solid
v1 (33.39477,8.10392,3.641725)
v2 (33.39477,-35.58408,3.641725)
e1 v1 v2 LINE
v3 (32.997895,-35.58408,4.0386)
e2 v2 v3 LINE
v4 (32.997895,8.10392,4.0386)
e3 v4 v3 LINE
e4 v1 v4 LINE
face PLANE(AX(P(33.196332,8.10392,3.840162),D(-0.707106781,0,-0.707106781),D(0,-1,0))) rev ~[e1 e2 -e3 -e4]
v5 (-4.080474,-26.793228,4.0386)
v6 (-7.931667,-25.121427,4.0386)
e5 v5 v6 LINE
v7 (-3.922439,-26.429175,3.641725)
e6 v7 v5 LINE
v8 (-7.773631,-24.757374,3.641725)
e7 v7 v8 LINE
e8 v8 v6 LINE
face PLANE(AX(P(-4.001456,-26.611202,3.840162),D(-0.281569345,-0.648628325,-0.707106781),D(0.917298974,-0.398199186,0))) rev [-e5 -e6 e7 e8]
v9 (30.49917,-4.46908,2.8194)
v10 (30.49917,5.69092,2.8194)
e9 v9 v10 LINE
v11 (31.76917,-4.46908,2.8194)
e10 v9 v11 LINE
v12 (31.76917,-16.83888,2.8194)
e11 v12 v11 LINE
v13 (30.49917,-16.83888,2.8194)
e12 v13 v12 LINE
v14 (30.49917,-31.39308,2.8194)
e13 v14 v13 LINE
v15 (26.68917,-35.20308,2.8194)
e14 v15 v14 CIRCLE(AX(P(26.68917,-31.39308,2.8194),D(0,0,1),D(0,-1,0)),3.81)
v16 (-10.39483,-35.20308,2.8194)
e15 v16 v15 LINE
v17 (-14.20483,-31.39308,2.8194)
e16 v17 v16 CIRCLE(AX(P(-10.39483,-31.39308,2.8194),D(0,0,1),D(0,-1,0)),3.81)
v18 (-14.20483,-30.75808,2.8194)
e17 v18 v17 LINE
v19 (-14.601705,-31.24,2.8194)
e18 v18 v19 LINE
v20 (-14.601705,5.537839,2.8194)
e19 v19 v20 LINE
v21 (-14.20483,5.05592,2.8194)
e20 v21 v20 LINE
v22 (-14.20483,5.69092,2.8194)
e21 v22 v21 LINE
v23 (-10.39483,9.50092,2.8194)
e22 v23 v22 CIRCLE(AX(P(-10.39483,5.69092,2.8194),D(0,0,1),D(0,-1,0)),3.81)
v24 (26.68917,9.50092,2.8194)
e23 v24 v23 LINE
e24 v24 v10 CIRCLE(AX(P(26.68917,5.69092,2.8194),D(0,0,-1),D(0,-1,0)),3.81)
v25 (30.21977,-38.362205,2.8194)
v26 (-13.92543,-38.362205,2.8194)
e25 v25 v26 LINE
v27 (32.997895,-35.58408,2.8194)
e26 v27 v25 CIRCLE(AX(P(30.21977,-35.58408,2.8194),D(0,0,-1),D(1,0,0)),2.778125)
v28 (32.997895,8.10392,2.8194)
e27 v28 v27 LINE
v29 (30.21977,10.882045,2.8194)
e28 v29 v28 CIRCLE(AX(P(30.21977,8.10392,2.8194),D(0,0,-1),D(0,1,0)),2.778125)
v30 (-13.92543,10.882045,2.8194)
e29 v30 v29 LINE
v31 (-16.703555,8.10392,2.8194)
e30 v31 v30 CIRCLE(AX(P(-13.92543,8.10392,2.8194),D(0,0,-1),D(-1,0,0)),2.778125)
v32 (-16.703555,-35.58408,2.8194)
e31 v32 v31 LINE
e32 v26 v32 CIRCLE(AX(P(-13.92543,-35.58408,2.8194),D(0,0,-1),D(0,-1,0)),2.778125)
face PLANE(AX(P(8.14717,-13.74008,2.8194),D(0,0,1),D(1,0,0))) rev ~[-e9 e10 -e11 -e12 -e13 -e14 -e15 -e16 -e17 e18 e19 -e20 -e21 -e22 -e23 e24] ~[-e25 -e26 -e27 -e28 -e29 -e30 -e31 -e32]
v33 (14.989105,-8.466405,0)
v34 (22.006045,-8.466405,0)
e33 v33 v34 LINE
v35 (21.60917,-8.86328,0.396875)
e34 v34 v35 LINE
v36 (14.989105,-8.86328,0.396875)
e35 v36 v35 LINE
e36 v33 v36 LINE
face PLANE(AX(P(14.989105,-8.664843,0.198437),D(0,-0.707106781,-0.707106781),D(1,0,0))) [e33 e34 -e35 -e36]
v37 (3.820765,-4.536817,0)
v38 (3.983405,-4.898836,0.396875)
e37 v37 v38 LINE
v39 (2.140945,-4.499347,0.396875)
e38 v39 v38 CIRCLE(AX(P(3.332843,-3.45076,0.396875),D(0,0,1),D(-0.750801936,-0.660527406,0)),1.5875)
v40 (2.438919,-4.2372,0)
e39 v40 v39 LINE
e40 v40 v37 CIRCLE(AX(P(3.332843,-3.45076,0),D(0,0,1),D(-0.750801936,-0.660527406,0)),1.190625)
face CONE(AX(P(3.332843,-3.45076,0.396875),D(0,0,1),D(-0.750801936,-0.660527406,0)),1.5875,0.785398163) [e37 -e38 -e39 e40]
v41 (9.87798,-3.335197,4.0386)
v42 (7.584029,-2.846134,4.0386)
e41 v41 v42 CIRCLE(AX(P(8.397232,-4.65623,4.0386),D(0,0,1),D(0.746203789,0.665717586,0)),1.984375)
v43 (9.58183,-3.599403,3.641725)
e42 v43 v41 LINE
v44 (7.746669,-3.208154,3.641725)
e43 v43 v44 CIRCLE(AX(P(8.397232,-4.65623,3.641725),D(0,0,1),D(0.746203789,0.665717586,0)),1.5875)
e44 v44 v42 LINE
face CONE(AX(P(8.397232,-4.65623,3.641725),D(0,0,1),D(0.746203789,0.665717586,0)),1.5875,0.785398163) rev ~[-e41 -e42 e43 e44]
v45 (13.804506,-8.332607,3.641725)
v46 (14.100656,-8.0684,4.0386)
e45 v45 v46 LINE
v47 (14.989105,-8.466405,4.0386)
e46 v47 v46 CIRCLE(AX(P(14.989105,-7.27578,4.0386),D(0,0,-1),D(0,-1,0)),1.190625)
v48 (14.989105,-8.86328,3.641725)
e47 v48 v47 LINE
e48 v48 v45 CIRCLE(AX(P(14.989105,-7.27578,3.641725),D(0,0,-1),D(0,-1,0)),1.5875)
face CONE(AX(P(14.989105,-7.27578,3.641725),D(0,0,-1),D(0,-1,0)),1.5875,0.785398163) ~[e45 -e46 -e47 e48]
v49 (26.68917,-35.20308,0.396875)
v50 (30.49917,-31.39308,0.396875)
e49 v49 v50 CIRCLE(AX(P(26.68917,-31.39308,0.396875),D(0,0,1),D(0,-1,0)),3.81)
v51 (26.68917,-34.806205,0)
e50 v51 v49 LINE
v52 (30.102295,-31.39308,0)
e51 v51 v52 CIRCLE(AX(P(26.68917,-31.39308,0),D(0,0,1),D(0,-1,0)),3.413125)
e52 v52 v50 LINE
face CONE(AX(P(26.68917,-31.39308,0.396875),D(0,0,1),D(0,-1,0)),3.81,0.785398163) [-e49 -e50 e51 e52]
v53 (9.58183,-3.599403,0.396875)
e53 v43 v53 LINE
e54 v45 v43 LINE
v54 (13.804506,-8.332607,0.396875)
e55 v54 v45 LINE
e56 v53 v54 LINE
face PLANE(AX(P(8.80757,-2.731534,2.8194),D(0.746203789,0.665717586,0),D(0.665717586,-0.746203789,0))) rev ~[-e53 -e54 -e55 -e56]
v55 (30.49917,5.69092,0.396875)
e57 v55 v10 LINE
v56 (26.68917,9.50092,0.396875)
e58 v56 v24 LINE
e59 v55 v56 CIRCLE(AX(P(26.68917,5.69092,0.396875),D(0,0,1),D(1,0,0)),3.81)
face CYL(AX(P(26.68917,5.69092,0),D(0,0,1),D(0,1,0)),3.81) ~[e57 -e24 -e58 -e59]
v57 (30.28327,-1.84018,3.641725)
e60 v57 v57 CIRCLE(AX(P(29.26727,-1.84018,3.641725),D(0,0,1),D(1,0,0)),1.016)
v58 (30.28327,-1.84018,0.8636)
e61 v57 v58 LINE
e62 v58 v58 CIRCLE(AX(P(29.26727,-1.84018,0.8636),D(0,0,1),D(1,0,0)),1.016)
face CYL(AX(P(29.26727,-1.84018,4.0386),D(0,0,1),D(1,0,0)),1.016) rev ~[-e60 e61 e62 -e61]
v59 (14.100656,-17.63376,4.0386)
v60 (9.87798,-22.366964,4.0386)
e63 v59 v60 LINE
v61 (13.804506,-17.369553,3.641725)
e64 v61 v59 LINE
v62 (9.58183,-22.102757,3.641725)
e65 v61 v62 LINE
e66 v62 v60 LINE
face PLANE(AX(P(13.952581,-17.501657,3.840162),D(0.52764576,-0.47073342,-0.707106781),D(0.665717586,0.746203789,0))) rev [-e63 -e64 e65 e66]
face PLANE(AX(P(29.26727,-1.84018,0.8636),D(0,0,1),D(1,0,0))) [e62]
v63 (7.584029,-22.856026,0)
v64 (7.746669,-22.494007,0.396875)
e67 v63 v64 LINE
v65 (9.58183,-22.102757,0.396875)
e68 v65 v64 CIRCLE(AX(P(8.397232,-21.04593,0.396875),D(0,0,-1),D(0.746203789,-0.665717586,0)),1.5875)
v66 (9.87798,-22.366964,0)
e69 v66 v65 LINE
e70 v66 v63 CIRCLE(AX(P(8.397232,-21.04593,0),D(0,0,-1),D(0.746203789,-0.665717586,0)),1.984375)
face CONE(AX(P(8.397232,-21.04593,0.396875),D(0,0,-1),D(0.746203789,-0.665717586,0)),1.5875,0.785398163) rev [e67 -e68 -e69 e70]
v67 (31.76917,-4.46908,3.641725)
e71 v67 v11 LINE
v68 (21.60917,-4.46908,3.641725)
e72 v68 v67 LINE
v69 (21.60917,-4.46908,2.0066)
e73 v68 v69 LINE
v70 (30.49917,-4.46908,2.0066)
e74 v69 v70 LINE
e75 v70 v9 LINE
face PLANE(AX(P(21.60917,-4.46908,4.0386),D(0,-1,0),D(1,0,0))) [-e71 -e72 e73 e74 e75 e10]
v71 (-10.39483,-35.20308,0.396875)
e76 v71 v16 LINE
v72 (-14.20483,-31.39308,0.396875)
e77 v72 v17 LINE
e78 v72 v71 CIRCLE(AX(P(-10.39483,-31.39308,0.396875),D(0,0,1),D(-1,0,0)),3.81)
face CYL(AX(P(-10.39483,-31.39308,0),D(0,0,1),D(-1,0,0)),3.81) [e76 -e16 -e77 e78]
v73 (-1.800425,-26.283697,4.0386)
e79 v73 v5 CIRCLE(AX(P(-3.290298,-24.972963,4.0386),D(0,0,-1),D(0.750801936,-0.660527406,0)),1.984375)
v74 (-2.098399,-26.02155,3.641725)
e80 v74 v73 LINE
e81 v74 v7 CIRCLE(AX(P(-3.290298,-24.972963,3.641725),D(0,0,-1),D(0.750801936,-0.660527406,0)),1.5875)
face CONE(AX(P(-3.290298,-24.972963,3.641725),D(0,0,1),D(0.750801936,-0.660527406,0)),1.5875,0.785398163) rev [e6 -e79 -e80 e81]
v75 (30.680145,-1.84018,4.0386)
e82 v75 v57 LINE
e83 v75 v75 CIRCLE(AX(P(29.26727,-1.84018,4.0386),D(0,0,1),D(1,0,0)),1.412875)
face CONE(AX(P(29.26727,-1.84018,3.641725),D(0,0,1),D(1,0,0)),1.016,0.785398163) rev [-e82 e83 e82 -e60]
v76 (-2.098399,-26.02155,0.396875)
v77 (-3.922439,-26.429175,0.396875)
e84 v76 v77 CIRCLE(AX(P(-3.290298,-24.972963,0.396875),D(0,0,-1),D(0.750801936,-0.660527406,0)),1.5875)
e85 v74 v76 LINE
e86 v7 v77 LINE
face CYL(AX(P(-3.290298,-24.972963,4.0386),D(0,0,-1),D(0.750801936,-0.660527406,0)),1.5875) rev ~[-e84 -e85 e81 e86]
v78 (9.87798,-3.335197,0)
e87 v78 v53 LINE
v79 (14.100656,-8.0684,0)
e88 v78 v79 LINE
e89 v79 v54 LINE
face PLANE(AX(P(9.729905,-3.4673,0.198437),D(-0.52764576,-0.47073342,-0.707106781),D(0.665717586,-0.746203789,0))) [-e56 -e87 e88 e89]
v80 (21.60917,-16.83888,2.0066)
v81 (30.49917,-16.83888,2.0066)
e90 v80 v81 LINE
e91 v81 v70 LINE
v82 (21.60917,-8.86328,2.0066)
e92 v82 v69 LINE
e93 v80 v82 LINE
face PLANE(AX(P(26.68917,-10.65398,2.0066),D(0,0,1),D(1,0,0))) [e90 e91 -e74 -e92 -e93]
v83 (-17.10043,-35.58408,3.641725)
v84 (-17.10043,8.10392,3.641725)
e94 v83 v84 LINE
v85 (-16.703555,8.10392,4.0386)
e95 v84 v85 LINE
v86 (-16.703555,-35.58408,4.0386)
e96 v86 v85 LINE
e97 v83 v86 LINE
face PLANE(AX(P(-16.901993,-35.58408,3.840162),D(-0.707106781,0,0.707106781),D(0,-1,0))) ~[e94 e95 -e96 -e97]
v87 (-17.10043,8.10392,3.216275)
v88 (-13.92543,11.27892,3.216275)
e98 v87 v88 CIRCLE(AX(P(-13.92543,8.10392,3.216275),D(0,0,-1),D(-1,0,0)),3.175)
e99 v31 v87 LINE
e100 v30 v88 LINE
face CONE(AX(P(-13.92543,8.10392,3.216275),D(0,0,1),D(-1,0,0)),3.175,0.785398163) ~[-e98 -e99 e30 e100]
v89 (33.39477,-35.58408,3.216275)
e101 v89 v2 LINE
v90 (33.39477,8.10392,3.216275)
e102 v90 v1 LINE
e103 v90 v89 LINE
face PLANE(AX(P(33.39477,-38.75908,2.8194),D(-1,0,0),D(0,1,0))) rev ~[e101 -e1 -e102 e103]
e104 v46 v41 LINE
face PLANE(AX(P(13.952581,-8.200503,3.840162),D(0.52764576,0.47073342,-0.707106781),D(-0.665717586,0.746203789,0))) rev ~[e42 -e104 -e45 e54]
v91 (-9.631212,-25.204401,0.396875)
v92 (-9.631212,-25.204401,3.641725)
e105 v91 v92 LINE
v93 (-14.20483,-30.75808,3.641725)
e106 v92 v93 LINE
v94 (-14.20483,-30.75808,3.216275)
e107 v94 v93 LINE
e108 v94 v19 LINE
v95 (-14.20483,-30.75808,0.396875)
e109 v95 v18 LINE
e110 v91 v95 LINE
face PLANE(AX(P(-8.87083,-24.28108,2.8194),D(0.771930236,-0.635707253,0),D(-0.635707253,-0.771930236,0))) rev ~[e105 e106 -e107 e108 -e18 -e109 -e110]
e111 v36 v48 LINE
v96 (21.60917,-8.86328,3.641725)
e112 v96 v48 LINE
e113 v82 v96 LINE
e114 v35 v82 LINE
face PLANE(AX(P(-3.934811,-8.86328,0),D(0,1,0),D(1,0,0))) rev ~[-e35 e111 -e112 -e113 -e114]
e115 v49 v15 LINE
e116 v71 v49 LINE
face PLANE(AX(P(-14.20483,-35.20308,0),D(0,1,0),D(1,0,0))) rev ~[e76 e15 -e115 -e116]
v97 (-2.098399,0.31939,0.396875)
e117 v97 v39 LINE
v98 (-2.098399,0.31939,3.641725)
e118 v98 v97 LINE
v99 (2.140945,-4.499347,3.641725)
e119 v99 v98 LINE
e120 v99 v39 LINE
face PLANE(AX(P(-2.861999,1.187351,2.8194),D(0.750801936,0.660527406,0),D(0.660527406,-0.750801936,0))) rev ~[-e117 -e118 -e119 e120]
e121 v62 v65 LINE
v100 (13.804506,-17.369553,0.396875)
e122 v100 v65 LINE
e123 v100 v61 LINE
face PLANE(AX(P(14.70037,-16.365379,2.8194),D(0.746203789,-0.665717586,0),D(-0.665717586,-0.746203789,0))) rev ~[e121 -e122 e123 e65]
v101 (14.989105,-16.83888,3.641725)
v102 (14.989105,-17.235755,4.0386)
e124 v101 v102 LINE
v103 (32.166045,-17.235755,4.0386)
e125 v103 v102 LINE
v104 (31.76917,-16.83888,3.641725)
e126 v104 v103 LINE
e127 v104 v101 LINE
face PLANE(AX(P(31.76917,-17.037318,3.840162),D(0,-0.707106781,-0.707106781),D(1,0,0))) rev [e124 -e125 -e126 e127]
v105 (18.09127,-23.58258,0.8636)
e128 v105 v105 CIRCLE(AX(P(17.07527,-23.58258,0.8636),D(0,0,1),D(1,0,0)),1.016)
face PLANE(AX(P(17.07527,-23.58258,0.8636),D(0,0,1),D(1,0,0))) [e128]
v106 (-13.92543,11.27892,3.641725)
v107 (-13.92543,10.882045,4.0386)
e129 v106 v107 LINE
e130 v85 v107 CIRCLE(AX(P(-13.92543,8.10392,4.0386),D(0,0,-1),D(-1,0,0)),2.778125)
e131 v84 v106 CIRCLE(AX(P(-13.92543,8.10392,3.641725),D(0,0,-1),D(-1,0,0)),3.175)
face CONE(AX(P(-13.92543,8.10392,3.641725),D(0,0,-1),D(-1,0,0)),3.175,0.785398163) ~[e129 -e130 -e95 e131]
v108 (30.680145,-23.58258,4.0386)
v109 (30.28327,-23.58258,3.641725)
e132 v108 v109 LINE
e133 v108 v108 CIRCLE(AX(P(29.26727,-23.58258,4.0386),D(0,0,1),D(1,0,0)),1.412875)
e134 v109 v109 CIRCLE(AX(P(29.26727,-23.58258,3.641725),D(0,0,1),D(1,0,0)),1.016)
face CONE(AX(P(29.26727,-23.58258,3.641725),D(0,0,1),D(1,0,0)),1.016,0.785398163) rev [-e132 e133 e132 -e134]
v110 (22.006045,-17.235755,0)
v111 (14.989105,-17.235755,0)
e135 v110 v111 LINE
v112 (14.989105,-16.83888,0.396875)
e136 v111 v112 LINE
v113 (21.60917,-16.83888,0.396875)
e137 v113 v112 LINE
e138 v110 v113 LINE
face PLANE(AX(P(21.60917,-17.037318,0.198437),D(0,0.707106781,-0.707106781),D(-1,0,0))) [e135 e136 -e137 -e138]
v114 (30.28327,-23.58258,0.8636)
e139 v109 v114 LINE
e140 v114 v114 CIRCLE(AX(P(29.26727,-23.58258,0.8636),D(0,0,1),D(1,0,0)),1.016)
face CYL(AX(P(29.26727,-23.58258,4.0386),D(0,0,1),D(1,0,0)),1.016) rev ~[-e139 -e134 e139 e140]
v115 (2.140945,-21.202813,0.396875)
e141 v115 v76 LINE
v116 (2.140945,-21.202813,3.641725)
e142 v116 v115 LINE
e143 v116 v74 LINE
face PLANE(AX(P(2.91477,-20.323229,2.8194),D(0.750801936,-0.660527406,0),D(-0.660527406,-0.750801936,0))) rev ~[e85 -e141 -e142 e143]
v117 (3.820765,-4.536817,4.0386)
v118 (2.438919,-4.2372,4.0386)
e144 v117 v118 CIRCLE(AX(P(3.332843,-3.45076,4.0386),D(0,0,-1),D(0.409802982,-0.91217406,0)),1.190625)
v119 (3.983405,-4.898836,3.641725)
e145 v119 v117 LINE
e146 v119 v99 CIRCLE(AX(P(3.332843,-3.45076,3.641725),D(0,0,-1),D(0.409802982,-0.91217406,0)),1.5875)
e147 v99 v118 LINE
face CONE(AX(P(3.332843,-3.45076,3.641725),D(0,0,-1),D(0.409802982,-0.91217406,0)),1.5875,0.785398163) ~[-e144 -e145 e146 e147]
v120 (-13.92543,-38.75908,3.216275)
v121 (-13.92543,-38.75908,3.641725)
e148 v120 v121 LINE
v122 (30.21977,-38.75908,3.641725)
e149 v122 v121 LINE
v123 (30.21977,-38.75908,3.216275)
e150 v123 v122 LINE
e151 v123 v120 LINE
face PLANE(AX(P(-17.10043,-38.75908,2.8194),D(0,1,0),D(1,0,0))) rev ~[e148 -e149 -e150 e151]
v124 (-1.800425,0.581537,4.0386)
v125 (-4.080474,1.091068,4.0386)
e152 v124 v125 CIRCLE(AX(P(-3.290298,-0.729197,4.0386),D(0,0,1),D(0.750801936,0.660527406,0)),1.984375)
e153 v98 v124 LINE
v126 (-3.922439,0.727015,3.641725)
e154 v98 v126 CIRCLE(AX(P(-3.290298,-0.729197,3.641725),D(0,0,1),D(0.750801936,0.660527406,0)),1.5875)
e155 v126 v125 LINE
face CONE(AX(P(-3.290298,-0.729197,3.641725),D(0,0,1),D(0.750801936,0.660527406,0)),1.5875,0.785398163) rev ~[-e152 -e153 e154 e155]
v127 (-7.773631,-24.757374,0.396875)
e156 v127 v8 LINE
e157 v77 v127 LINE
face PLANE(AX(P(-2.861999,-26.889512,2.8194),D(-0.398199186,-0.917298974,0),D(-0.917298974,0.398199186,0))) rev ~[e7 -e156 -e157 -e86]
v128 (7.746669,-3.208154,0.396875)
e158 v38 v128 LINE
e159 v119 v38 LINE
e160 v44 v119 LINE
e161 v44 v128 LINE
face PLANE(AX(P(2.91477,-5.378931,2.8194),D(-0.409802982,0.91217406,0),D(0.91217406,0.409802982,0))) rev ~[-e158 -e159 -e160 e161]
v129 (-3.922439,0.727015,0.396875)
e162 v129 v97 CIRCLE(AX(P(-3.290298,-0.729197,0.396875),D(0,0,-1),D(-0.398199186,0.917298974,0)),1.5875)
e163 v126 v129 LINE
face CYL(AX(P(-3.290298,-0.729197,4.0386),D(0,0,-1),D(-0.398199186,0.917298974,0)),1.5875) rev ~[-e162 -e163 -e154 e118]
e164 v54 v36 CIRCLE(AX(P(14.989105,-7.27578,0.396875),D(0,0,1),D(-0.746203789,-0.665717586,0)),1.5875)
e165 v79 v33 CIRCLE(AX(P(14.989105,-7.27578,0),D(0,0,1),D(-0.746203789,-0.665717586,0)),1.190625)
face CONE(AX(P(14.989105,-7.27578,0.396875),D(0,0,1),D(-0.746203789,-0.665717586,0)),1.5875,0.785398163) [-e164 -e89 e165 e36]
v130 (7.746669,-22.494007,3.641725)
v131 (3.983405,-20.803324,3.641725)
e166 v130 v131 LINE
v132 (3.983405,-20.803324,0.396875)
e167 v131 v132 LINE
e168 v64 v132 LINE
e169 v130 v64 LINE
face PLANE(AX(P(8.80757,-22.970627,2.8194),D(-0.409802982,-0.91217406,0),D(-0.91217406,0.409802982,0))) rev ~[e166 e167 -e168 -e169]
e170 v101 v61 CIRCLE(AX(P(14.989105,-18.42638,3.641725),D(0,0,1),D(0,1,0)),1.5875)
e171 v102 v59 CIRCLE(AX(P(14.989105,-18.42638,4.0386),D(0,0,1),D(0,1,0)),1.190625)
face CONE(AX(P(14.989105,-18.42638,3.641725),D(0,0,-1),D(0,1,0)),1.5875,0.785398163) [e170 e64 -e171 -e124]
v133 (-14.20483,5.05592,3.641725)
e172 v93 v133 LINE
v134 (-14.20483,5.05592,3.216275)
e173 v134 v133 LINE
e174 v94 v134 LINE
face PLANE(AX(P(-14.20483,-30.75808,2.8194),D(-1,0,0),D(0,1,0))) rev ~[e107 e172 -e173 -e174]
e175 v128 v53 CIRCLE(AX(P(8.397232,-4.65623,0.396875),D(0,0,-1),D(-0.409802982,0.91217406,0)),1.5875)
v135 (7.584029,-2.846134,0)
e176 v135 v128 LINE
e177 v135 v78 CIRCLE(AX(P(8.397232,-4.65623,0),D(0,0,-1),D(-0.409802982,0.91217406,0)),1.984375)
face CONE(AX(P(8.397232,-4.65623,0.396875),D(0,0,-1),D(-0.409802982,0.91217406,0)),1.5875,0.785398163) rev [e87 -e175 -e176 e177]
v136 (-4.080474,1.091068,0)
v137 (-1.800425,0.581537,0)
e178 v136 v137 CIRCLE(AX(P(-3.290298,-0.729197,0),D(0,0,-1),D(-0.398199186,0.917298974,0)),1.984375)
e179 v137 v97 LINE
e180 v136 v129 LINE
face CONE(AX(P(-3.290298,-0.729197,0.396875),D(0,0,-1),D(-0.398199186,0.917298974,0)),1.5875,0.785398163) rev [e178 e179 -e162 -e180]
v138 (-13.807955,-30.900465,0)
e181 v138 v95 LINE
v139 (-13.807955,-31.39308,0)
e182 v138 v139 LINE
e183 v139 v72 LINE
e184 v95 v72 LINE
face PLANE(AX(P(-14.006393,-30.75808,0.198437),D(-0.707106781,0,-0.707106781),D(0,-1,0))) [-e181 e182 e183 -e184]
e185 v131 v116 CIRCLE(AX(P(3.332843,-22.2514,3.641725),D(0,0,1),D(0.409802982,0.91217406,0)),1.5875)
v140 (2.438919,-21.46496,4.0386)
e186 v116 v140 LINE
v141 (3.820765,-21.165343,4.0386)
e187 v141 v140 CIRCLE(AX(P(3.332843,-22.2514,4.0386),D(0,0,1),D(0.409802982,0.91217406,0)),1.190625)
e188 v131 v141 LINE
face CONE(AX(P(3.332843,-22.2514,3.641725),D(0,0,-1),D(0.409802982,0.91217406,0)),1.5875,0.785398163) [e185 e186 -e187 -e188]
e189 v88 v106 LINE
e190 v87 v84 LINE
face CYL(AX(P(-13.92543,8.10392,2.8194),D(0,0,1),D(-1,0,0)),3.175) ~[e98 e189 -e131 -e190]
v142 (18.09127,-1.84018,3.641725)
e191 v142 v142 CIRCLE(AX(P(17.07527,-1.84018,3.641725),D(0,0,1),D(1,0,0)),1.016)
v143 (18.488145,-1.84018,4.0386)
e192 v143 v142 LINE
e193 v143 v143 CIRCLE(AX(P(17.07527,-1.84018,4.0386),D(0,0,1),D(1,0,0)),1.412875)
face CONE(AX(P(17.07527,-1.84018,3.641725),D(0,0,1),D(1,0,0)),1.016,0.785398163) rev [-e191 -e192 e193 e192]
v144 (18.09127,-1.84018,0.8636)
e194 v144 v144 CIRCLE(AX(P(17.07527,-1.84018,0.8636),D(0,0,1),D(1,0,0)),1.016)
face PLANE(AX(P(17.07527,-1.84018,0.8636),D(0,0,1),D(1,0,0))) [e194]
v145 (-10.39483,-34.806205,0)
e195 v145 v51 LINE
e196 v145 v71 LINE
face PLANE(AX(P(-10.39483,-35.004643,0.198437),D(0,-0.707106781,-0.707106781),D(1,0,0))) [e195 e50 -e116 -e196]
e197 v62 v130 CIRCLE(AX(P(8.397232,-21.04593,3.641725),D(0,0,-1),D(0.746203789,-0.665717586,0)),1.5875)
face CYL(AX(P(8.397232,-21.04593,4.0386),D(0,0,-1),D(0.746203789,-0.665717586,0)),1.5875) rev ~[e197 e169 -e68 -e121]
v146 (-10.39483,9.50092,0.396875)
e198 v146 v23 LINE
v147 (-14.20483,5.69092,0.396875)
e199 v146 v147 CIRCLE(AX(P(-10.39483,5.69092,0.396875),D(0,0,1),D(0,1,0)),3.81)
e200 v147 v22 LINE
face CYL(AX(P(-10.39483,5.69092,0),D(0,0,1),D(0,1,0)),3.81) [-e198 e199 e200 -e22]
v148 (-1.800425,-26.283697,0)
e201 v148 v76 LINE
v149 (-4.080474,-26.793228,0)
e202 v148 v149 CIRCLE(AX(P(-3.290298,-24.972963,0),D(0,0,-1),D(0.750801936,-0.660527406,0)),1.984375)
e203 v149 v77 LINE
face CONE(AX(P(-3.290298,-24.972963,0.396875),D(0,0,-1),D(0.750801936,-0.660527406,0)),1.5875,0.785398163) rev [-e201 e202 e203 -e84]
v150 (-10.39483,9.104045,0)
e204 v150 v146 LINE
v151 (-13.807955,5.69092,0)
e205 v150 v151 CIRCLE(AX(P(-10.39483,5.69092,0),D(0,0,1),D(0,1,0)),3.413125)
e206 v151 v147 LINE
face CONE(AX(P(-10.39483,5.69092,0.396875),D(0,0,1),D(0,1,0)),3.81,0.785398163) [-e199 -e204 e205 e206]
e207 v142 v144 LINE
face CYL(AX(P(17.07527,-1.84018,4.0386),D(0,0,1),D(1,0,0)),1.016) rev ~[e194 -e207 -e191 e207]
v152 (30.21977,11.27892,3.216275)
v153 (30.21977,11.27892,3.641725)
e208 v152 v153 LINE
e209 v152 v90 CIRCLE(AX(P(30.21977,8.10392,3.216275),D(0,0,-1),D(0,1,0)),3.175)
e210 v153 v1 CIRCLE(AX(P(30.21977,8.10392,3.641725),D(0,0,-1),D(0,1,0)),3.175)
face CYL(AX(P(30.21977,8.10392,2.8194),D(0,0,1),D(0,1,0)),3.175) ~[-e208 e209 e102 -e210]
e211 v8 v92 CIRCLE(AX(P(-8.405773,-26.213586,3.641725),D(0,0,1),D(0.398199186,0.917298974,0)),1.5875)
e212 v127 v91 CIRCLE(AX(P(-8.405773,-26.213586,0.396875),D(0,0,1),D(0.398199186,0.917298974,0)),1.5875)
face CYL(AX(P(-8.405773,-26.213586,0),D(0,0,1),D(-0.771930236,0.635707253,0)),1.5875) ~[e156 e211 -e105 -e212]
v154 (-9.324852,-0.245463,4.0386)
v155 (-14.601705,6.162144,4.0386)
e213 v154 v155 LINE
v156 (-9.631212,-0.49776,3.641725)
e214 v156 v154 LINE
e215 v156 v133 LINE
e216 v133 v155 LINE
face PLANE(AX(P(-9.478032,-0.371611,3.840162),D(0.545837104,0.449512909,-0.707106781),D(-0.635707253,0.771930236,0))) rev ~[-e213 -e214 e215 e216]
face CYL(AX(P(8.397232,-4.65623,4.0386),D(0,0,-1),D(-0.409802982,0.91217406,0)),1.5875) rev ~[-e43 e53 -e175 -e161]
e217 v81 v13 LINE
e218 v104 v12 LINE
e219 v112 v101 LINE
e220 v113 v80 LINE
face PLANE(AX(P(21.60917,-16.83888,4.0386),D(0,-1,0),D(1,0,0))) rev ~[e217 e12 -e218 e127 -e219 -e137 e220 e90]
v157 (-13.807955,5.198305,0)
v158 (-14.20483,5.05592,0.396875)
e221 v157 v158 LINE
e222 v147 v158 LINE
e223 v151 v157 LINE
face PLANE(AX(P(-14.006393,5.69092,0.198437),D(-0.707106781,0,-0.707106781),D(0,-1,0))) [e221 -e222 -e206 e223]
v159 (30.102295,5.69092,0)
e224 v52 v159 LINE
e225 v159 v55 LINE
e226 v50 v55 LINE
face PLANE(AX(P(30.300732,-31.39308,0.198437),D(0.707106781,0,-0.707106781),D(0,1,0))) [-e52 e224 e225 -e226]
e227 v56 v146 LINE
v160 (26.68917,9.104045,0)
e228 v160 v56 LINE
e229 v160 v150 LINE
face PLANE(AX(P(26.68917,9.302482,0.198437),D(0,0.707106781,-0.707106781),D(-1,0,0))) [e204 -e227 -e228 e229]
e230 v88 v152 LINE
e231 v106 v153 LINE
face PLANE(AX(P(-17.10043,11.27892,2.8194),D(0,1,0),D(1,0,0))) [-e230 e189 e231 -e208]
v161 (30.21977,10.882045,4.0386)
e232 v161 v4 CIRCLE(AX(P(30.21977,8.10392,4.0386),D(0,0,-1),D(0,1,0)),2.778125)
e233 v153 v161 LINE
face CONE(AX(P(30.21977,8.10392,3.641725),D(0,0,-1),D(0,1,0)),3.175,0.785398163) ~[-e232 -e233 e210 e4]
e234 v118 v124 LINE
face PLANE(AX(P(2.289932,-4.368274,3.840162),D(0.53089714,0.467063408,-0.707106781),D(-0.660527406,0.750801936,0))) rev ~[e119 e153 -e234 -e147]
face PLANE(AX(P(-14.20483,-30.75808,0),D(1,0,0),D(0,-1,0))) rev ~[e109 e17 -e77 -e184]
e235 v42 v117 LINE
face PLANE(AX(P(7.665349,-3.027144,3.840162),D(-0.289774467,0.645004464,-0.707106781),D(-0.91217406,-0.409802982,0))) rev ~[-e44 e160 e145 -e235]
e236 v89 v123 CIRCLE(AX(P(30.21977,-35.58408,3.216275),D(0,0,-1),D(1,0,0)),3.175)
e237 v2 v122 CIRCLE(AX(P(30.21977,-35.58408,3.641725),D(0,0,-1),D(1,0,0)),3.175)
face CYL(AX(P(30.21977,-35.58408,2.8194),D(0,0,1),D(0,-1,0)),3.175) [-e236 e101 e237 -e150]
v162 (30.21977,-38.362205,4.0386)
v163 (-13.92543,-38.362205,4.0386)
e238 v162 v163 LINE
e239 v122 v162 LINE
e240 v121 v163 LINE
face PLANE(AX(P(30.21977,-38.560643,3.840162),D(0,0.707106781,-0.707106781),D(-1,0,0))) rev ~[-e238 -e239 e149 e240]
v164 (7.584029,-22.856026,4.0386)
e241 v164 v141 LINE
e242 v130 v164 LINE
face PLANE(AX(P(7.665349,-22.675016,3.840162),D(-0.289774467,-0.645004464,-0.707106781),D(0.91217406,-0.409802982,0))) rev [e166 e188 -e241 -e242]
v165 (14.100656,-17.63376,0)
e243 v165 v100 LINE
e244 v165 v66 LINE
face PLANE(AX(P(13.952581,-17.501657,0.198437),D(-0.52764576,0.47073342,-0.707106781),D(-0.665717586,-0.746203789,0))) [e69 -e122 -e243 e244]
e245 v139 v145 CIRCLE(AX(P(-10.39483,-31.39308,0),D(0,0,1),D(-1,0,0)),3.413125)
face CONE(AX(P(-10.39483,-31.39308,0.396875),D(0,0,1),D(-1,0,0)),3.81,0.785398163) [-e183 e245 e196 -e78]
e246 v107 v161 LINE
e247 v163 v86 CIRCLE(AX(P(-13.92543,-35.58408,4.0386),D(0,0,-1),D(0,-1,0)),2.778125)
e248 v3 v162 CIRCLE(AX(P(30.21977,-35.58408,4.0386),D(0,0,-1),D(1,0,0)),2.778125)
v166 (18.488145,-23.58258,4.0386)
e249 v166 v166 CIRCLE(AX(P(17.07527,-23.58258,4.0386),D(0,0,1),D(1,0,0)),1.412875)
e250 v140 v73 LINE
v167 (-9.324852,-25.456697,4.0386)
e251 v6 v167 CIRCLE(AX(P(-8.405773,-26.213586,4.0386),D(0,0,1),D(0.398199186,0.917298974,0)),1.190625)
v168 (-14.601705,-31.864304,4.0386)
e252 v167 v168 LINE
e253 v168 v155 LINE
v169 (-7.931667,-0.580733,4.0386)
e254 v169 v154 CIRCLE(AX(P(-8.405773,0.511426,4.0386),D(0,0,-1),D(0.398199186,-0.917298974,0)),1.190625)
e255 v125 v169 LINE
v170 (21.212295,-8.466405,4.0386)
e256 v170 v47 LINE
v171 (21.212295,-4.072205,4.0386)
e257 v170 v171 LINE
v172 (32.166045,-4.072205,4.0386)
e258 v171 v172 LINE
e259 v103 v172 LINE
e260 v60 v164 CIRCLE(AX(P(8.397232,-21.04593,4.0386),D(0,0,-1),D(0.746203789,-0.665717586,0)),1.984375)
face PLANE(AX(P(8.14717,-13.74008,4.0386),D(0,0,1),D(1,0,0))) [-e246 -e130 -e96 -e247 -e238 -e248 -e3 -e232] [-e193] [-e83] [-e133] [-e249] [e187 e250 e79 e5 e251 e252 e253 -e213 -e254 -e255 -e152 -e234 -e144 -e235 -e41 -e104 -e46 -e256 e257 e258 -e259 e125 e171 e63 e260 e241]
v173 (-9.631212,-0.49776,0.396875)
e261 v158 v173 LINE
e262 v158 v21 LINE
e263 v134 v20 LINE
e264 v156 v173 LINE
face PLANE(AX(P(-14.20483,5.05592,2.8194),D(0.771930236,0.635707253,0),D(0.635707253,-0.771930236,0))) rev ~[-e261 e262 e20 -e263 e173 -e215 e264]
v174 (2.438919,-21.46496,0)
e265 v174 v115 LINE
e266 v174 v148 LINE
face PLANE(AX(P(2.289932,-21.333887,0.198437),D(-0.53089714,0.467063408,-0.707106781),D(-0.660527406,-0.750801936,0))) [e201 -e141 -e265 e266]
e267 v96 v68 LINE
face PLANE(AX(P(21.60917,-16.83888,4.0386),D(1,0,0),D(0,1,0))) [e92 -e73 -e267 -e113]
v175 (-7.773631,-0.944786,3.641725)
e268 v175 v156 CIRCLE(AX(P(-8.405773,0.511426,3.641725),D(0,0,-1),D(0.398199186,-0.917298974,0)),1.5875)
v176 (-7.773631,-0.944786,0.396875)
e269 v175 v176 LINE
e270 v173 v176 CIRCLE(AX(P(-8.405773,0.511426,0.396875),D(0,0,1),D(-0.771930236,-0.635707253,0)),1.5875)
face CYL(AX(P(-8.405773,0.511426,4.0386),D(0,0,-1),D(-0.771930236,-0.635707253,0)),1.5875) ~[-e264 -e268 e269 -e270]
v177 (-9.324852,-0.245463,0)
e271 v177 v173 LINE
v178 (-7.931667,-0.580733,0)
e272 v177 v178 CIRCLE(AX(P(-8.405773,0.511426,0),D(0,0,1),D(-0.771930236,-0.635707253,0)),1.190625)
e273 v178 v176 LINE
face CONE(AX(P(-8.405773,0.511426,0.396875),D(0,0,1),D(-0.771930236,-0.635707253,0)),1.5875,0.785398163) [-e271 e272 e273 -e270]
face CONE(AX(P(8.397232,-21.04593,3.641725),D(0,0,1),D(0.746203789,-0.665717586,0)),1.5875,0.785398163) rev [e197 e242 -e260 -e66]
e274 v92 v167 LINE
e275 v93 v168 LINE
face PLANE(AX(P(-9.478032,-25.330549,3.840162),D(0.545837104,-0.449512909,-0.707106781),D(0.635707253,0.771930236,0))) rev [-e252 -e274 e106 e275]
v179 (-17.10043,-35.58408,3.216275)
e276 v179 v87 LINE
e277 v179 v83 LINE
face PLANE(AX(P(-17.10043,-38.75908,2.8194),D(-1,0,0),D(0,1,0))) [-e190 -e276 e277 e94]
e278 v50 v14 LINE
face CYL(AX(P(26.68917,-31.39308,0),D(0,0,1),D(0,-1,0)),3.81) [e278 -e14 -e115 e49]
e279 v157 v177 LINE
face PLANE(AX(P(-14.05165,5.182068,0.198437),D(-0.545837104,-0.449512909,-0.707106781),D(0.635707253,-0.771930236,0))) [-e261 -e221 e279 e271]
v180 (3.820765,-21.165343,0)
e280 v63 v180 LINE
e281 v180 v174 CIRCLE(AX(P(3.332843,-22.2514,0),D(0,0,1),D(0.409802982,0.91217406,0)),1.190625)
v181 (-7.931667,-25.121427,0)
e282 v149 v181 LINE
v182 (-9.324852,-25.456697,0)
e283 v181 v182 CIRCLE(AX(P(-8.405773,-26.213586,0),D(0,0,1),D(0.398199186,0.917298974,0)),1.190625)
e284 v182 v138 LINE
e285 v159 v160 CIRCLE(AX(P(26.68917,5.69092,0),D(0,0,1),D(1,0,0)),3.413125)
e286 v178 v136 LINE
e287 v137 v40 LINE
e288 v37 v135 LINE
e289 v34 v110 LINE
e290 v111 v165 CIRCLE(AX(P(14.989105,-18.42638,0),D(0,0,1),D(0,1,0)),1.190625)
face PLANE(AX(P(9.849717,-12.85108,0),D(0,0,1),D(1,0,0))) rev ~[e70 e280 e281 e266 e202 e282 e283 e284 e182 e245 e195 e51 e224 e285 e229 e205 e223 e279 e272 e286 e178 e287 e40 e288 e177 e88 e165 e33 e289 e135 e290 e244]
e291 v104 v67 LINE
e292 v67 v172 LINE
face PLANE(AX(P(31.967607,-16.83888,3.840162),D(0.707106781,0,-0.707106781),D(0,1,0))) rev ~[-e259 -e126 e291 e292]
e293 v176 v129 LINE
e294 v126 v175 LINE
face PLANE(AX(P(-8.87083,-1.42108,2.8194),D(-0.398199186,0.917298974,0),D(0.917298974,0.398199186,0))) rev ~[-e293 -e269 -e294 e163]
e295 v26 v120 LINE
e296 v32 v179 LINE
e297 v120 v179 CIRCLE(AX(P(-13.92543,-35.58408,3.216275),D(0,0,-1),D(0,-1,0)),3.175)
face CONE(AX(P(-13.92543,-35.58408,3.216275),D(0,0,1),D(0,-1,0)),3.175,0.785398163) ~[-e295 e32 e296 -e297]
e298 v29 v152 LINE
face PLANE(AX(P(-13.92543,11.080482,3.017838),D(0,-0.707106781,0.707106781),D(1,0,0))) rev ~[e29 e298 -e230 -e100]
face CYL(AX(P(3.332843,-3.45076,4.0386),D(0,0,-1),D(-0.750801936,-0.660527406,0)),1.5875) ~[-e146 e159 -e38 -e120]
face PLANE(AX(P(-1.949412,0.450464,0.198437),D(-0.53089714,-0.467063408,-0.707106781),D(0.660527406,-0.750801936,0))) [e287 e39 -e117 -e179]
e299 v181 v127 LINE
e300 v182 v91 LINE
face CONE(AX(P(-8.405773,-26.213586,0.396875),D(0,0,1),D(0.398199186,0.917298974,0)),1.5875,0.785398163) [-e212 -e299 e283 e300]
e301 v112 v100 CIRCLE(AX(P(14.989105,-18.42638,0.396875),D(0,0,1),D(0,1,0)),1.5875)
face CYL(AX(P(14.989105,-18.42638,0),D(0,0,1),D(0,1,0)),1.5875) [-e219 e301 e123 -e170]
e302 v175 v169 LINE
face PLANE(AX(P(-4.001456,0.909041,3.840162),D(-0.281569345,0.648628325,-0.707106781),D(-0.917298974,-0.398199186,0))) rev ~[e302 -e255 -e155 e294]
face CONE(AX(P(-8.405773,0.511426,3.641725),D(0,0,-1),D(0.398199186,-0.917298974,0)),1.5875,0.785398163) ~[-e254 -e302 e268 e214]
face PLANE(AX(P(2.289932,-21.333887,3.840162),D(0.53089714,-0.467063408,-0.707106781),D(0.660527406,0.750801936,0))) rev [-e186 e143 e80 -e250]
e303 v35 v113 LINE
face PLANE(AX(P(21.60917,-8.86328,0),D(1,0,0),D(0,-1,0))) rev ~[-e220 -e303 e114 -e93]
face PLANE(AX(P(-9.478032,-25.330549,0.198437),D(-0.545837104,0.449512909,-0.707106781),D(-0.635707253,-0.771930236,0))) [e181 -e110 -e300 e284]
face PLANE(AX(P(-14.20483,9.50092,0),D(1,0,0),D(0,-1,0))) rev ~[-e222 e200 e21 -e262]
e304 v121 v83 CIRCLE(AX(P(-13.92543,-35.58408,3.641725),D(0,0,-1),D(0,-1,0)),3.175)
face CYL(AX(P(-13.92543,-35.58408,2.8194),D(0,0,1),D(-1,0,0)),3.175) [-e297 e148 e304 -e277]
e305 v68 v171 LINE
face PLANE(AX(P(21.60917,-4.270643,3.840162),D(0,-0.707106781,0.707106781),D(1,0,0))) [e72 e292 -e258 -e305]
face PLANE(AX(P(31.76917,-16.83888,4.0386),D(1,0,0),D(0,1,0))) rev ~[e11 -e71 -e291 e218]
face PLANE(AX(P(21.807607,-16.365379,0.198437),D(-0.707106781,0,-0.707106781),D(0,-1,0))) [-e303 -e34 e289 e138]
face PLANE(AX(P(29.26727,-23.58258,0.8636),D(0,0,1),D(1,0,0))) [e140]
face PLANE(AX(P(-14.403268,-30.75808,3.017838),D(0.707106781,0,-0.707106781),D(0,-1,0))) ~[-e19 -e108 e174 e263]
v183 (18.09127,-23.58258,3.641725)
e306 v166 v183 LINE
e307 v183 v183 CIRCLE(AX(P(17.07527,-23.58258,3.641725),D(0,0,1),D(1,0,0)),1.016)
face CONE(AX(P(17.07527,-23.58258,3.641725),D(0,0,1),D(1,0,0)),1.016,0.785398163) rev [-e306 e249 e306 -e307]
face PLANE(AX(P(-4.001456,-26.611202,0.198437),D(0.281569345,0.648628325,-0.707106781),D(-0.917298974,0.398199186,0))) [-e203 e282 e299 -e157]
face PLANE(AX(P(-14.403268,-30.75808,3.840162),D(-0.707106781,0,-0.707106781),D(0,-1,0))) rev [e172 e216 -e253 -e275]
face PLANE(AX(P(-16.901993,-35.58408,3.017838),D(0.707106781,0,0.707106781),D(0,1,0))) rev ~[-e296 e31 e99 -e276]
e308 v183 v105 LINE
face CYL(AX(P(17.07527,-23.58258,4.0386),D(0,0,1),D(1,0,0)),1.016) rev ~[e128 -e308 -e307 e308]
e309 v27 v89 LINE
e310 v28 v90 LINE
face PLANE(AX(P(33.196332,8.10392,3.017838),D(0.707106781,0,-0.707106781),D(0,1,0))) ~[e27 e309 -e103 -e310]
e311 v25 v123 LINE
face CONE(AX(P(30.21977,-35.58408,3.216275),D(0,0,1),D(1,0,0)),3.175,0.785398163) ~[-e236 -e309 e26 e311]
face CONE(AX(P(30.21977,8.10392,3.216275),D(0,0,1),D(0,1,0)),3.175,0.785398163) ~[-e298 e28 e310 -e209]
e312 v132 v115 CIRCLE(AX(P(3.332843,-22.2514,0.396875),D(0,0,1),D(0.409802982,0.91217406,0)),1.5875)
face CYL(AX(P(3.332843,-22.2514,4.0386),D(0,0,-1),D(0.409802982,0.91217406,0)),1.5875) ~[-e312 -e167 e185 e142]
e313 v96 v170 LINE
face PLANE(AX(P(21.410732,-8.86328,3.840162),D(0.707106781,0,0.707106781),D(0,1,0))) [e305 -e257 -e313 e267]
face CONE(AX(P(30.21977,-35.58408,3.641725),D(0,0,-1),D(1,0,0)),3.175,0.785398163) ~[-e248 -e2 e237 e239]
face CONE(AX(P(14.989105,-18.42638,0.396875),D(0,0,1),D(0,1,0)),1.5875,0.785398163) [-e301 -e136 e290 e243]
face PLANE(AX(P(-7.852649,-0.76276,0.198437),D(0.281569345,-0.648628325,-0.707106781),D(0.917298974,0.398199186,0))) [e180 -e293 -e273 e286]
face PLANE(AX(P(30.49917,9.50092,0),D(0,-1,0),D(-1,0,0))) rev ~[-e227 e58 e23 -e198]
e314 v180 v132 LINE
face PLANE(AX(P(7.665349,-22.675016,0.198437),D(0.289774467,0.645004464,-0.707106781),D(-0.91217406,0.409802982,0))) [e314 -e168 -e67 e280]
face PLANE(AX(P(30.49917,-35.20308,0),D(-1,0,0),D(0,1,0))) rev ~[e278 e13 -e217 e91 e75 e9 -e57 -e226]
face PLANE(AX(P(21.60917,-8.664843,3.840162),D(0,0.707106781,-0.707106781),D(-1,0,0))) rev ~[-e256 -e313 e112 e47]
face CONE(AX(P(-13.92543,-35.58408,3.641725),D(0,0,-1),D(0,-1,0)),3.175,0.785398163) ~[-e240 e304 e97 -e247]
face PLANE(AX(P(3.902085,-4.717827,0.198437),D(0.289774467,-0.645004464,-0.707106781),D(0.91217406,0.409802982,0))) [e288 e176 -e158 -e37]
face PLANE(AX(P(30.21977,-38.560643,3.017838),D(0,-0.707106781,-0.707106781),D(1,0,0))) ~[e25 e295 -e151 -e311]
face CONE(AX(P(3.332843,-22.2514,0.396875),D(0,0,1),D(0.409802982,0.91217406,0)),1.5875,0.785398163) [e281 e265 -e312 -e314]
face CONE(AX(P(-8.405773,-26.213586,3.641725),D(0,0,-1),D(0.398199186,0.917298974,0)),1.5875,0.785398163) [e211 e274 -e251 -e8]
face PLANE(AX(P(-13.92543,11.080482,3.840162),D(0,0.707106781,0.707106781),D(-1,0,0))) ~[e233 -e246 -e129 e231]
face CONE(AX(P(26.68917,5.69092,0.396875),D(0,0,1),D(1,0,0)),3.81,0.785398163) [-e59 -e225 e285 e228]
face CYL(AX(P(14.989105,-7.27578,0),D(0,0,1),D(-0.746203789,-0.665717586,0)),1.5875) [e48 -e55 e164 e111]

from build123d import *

# Parameters (mm, degrees)
F15_DEPTH = 2.8194
F1_W      = 50.4952
F1_H      = 50.038
F2_DEPTH  = 1.2192
F3_R      = 1.016
F4_DEPTH  = 3.175
F5_W      = 25.5439807123
F5_H      = 7.9756
F6_DEPTH  = 4.0396
F7_W      = 10.16
F7_H      = 12.3698
F8_DEPTH  = 2.032
F9_R      = 3.81
F10_R     = 3.175
F11_R     = 1.5875
F12_SIZE  = 0.396875
F13_SIZE  = 0.396875


# Not quite as in the source:
# - a feature of the source that left no trace in its solid (it failed there, or was rolled back) is left out


with BuildPart() as f15:
    # F0 (on Top) → F15 (new body)
    with BuildSketch(Plane.XY):
        Polygon((30.4991698359, 9.5009198412), (-14.2048301641, 9.5009198412), (-14.2048301641, 5.0559198412), (-8.8708301641, -1.4210801588), (-2.8619992453, 1.1873513896), (2.9147698359, -5.378930905), (8.8075698359, -2.7315337496), (14.7003698359, -9.3367816513), (21.6091698359, -9.3367816513), (21.6091698359, -16.3653786662), (14.7003698359, -16.3653786662), (8.8075698359, -22.970626568), (2.9147698359, -20.3232294125), (-2.8619992453, -26.8895117072), (-8.8708301641, -24.2810801588), (-14.2048301641, -30.7580801588), (-14.2048301641, -35.2030801588), (30.4991698359, -35.2030801588), align=None)
    extrude(amount=F15_DEPTH)

    # F1 (on face) → F2 (join)
    with BuildSketch(Plane.XY.offset(2.8194)):
        with Locations((8.1471698359, -13.7400801588)):
            Rectangle(F1_W, F1_H)
        Polygon((-8.8708301641, -24.2810801588), (-14.2048301641, -30.7580801588), (-14.2048301641, 5.0559198412), (-8.8708301641, -1.4210801588), (-2.8619992453, 1.1873513896), (2.9147698359, -5.378930905), (8.8075698359, -2.7315337496), (14.7003698359, -9.3367816513), (21.6091698359, -9.3367816513), (21.6091698359, -16.3653786662), (14.7003698359, -16.3653786662), (8.8075698359, -22.970626568), (2.9147698359, -20.3232294125), (-2.8619992453, -26.8895117072), align=None, mode=Mode.SUBTRACT)
    extrude(amount=F2_DEPTH)

    # F3 (on face) → F4 (cut)
    with BuildSketch(Plane.XY.offset(4.0386)):
        with Locations((29.2672698359, -1.8401801588)):
            Circle(F3_R)
        with Locations((29.2672698359, -23.5825801588)):
            Circle(F3_R)
        with Locations((17.0752698359, -1.8401801588)):
            Circle(F3_R)
        with Locations((17.0752698359, -23.5825801588)):
            Circle(F3_R)
    extrude(amount=-F4_DEPTH, mode=Mode.SUBTRACT)

    # F5 (on face) → F6 (cut, through all)
    with BuildSketch(Plane(origin=(0, 0, 0), x_dir=(1, 0, 0), z_dir=(0, 0, -1))):
        with Locations((8.8371794797, 12.8510801588)):
            Rectangle(F5_W, F5_H)
    extrude(amount=-F6_DEPTH, mode=Mode.SUBTRACT)

    # F7 (on face) → F8 (cut)
    with BuildSketch(Plane.XY.offset(4.0386)):
        with Locations((26.6891698359, -10.6539801588)):
            Rectangle(F7_W, F7_H)
    extrude(amount=-F8_DEPTH, mode=Mode.SUBTRACT)

    # F9
    f9_edges = [f15.edges().sort_by_distance(p)[0] for p in [
        (-14.20483, -35.20308, 1.4097),
        (30.49917, -35.20308, 1.4097),
        (30.49917, 9.50092, 1.4097),
        (-14.20483, 9.50092, 1.4097),
    ]]
    fillet(f9_edges, radius=F9_R)

    # F10
    f10_edges = [f15.edges().sort_by_distance(p)[0] for p in [
        (33.39477, -38.75908, 3.429),
        (33.39477, 11.27892, 3.429),
        (-17.10043, 11.27892, 3.429),
        (-17.10043, -38.75908, 3.429),
    ]]
    fillet(f10_edges, radius=F10_R)

    # F11
    f11_edges = [f15.edges().sort_by_distance(p)[0] for p in [
        (-8.87083, -24.28108, 2.0193),
        (2.91477, -20.323229, 2.0193),
        (14.277941, -16.83888, 2.0193),
        (14.277941, -8.86328, 2.0193),
        (8.80757, -2.731534, 2.0193),
        (-2.861999, 1.187351, 2.0193),
        (-8.87083, -1.42108, 2.0193),
        (2.91477, -5.378931, 2.0193),
        (-2.861999, -26.889512, 2.0193),
        (8.80757, -22.970627, 2.0193),
    ]]
    fillet(f11_edges, radius=F11_R)

    # F12
    f12_edges = [f15.edges().sort_by_distance(p)[0] for p in [
        (-11.918021, -27.98124, 0),
        (-8.777201, -24.670149, 0),
        (-14.20483, -31.07558, 0),
        (-5.848035, -25.593275, 0),
        (-13.088907, -34.087157, 0),
        (-2.944073, -26.522248, 0),
        (8.14717, -35.20308, 0),
        (0.021273, -23.612182, 0),
        (29.383247, -34.087157, 0),
        (2.996452, -20.69995, 0),
        (30.49917, -12.85108, 0),
        (5.865037, -21.648665, 0),
        (29.383247, 8.384997, 0),
        (8.728242, -22.598537, 0),
        (8.14717, 9.50092, 0),
        (11.693168, -19.736155, 0),
        (-13.088907, 8.384997, 0),
        (14.340089, -16.97761, 0),
        (-14.20483, 5.37342, 0),
        (18.299137, -16.83888, 0),
        (-11.918021, 2.27908, 0),
        (21.60917, -12.85108, 0),
        (-8.777201, -1.032011, 0),
        (18.299137, -8.86328, 0),
        (-5.848035, -0.108886, 0),
        (14.340089, -8.72455, 0),
        (-2.944073, 0.820088, 0),
        (11.693168, -5.966005, 0),
        (0.021273, -2.089978, 0),
        (8.728242, -3.103623, 0),
        (2.996452, -5.00221, 0),
        (5.865037, -4.053495, 0),
    ]]
    chamfer(f12_edges, length=F12_SIZE)

    # F13
    f13_edges = [f15.edges().sort_by_distance(p)[0] for p in [
        (-14.20483, -12.85108, 2.8194),
        (-17.10043, -13.74008, 2.8194),
        (8.14717, -38.75908, 2.8194),
        (33.39477, -13.74008, 2.8194),
        (8.14717, 11.27892, 2.8194),
        (23.379137, -16.83888, 4.0386),
        (14.340089, -16.97761, 4.0386),
        (31.76917, -10.65398, 4.0386),
        (11.693168, -19.736155, 4.0386),
        (26.68917, -4.46908, 4.0386),
        (8.728242, -22.598537, 4.0386),
        (21.60917, -6.66618, 4.0386),
        (5.865037, -21.648665, 4.0386),
        (18.299137, -8.86328, 4.0386),
        (2.996452, -20.69995, 4.0386),
        (14.340089, -8.72455, 4.0386),
        (0.021273, -23.612182, 4.0386),
        (11.693168, -5.966005, 4.0386),
        (-2.944073, -26.522248, 4.0386),
        (8.728242, -3.103623, 4.0386),
        (-5.848035, -25.593275, 4.0386),
        (5.865037, -4.053495, 4.0386),
        (-8.777201, -24.670149, 4.0386),
        (2.996452, -5.00221, 4.0386),
        (-11.918021, -27.98124, 4.0386),
        (0.021273, -2.089978, 4.0386),
        (-14.20483, -12.85108, 4.0386),
        (-2.944073, 0.820088, 4.0386),
        (-11.918021, 2.27908, 4.0386),
        (-5.848035, -0.108886, 4.0386),
        (-8.777201, -1.032011, 4.0386),
        (-17.10043, -13.74008, 4.0386),
        (-16.170494, 10.348984, 4.0386),
        (-16.170494, -37.829144, 4.0386),
        (8.14717, 11.27892, 4.0386),
        (8.14717, -38.75908, 4.0386),
        (32.464834, 10.348984, 4.0386),
        (32.464834, -37.829144, 4.0386),
        (33.39477, -13.74008, 4.0386),
        (16.05927, -23.58258, 4.0386),
        (28.25127, -23.58258, 4.0386),
        (16.05927, -1.84018, 4.0386),
        (28.25127, -1.84018, 4.0386),
        (-16.170494, 10.348984, 2.8194),
        (-16.170494, -37.829144, 2.8194),
        (32.464834, 10.348984, 2.8194),
        (32.464834, -37.829144, 2.8194),
    ]]
    chamfer(f13_edges, length=F13_SIZE)


solid = f15.part
